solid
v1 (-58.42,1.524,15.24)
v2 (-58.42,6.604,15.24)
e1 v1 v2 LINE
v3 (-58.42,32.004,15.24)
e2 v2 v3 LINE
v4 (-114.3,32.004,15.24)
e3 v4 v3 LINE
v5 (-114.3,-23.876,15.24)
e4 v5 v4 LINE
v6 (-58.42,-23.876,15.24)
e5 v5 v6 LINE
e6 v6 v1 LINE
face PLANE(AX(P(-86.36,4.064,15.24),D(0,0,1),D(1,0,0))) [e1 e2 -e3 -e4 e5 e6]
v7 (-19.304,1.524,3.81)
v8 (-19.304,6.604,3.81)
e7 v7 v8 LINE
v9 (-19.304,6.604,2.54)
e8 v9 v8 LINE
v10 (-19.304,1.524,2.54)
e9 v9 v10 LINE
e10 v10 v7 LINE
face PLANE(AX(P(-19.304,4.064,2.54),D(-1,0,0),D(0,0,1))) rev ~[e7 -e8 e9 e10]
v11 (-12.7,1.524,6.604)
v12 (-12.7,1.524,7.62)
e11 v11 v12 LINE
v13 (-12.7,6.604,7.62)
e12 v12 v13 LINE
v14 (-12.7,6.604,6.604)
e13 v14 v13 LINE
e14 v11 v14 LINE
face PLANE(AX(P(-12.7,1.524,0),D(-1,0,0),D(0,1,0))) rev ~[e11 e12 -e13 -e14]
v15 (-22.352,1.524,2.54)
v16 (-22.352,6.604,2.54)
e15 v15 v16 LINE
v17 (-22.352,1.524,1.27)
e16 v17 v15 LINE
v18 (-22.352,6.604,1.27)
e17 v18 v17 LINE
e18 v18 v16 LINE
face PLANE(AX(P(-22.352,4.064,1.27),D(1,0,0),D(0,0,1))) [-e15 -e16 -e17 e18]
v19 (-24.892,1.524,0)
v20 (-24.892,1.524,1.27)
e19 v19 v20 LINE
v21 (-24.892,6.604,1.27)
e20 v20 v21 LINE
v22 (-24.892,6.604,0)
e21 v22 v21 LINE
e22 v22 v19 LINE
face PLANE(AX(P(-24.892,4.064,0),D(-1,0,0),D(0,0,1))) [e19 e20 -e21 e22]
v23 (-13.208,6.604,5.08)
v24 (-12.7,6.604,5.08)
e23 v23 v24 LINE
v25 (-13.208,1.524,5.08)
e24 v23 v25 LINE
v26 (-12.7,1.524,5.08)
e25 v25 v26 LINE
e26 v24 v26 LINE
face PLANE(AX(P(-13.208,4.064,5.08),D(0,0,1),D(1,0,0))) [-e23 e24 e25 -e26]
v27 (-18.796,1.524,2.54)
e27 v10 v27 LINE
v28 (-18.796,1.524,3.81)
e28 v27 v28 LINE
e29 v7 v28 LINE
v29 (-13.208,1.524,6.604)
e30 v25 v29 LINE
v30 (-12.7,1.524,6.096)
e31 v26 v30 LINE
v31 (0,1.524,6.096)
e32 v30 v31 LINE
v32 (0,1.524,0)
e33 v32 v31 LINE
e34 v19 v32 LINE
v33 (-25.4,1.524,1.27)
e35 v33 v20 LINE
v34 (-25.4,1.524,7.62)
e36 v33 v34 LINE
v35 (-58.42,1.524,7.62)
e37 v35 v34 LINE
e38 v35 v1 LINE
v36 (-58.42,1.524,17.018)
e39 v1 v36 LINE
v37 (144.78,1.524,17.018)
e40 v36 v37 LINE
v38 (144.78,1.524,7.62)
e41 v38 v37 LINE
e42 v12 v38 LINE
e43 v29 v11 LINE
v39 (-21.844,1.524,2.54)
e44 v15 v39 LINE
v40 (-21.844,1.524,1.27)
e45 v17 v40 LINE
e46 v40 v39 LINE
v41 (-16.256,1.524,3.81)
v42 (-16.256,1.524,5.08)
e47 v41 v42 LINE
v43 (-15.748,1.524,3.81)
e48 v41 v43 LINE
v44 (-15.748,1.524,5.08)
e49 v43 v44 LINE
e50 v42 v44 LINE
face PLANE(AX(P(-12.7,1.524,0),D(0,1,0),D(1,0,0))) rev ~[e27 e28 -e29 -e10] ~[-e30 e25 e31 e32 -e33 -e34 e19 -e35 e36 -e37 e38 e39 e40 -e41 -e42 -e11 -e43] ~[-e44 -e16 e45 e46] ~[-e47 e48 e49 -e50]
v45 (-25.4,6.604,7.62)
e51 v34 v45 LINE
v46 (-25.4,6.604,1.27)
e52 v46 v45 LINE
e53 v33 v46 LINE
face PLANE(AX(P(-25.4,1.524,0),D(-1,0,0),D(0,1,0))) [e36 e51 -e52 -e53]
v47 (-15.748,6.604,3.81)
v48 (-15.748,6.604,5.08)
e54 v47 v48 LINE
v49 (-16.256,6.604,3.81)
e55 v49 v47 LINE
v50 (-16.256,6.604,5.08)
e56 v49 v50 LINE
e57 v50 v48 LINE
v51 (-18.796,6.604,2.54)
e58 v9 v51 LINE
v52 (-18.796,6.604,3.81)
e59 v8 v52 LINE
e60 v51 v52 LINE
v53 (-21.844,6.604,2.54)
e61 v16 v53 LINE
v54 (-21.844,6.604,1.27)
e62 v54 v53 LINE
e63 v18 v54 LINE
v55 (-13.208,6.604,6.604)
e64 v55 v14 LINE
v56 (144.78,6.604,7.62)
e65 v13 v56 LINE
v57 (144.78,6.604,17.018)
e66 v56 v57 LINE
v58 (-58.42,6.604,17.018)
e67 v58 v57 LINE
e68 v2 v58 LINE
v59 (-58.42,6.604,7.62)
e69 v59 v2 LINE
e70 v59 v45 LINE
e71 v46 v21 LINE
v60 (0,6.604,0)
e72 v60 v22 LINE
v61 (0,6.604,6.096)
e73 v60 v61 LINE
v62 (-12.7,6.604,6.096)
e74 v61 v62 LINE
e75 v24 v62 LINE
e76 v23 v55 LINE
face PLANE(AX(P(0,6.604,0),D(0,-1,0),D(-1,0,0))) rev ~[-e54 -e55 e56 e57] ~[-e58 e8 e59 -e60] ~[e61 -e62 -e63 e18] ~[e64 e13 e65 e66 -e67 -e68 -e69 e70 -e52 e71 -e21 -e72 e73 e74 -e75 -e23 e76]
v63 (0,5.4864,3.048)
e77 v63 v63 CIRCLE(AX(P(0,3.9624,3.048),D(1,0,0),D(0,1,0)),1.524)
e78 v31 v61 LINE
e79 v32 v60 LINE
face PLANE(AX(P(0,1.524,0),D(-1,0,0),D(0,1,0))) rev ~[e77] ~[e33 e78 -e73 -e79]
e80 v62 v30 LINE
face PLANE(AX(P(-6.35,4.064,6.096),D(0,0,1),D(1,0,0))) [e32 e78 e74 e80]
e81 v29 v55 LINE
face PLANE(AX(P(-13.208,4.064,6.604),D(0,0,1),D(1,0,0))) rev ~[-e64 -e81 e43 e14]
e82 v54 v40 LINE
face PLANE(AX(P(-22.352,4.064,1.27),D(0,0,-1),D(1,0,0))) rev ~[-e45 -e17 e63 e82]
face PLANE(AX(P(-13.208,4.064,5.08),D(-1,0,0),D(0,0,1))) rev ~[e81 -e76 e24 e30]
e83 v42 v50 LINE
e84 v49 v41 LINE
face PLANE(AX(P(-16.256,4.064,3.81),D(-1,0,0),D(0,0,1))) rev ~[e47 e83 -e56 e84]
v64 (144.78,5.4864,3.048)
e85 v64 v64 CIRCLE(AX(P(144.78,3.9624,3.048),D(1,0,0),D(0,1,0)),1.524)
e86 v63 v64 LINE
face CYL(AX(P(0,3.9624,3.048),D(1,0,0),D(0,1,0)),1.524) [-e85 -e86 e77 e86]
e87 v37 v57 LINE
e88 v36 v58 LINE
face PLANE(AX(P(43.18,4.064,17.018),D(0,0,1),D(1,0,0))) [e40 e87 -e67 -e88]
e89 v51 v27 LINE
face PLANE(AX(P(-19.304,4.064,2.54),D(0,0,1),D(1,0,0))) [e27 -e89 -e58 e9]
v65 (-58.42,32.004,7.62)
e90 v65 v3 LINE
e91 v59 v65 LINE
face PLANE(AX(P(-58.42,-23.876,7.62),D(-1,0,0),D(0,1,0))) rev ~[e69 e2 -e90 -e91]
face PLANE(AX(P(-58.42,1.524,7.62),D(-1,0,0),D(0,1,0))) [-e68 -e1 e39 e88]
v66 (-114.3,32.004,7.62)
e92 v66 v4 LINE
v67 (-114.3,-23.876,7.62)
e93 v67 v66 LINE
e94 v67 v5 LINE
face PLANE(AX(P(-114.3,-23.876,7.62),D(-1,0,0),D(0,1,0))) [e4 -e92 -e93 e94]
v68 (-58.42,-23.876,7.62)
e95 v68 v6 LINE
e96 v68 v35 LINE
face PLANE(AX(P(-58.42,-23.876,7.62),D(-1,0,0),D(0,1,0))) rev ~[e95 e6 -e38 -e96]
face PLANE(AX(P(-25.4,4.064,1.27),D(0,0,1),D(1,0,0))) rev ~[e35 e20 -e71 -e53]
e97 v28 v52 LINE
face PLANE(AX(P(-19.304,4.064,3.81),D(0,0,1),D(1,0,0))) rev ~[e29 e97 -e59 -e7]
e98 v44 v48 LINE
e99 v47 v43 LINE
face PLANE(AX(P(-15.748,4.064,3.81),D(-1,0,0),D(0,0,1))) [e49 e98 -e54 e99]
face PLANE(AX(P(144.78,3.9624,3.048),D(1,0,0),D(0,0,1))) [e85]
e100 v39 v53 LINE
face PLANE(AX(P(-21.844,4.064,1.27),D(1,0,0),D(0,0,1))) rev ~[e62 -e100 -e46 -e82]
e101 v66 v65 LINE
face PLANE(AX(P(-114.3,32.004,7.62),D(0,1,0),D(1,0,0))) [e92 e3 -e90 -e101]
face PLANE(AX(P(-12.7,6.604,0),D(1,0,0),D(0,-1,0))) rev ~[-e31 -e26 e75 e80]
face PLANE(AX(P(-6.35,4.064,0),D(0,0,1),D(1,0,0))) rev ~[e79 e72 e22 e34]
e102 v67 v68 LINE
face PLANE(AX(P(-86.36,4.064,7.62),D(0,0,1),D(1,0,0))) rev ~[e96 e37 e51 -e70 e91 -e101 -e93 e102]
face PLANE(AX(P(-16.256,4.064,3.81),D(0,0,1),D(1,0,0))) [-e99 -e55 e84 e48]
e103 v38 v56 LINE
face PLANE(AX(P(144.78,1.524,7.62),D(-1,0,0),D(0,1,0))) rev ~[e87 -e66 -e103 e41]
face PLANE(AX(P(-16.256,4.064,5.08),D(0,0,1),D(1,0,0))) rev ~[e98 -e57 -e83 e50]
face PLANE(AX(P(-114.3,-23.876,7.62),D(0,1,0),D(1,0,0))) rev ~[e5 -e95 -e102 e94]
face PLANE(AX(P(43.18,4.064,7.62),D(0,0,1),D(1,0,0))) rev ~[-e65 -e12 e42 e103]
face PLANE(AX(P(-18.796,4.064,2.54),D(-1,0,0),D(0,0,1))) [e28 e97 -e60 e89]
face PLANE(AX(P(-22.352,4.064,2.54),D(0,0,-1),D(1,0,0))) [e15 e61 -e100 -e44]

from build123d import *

# Parameters (mm, degrees)
F2_W      = 203.2
F2_H      = 5.08
F3_DEPTH  = 9.398
F0_W      = 12.7
F0_H      = 5.08
F12_DEPTH = 7.62
F11_W     = 0.508
F11_H     = 1.524
F11_H_2   = 1.27
F13_DEPTH = 2.54
F15_W     = 55.88
F15_H     = 55.88
F16_DEPTH = 7.62
F17_DEPTH = 6.096
F18_R     = 1.524


# Not quite as in the source:
# - a feature names something its author has since deleted; it is built from what else it names


with BuildPart() as f3:
    # F2 (on offset) → F3 (new body)
    with BuildSketch(Plane.XY.offset(7.62)):
        with Locations((43.18, 4.064)):
            Rectangle(F2_W, F2_H)
    extrude(amount=F3_DEPTH)

    # F0 (on Top) → F12 (join)
    with BuildSketch(Plane.XY):
        with Locations((-19.05, 4.064)):
            Rectangle(F0_W, F0_H)
    extrude(amount=F12_DEPTH)

    # F11 (on offset) → F13 (cut, symmetric)
    with BuildSketch(Plane.XZ.offset(-4.064)):
        with Locations((-12.954, 5.842)):
            Rectangle(F11_W, F11_H)
        with Locations((-25.146, 0.635)):
            Rectangle(F11_W, F11_H_2)
        with Locations((-19.05, 3.175)):
            Rectangle(F11_W, F11_H_2)
        with Locations((-16.002, 4.445)):
            Rectangle(F11_W, F11_H_2)
        with Locations((-22.098, 1.905)):
            Rectangle(F11_W, F11_H_2)
    extrude(amount=F13_DEPTH, both=True, mode=Mode.SUBTRACT)

    # F15 (on offset) → F16 (join)
    with BuildSketch(Plane.XY.offset(7.62)):
        with Locations((-86.36, 4.064)):
            Rectangle(F15_W, F15_H)
    extrude(amount=F16_DEPTH)

    # F0 (on Top) → F17 (join)
    with BuildSketch(Plane.XY):
        Polygon((-6.35, 1.524), (0, 1.524), (0, 6.604), (-12.7, 6.604), (-12.7, 1.524), align=None)
    extrude(amount=F17_DEPTH)

    # F21: sweep along a path in F20
    with BuildLine(Plane.XZ.offset(-3.9624)) as f21_path:
        Line((0, 3.048), (144.78, 3.048))
    # F18 (on Right) → F21 (sweep)
    with BuildSketch(Plane.YZ):
        with Locations((3.9624, 3.048)):
            Circle(F18_R)
    sweep(path=f21_path.line)


solid = f3.part
